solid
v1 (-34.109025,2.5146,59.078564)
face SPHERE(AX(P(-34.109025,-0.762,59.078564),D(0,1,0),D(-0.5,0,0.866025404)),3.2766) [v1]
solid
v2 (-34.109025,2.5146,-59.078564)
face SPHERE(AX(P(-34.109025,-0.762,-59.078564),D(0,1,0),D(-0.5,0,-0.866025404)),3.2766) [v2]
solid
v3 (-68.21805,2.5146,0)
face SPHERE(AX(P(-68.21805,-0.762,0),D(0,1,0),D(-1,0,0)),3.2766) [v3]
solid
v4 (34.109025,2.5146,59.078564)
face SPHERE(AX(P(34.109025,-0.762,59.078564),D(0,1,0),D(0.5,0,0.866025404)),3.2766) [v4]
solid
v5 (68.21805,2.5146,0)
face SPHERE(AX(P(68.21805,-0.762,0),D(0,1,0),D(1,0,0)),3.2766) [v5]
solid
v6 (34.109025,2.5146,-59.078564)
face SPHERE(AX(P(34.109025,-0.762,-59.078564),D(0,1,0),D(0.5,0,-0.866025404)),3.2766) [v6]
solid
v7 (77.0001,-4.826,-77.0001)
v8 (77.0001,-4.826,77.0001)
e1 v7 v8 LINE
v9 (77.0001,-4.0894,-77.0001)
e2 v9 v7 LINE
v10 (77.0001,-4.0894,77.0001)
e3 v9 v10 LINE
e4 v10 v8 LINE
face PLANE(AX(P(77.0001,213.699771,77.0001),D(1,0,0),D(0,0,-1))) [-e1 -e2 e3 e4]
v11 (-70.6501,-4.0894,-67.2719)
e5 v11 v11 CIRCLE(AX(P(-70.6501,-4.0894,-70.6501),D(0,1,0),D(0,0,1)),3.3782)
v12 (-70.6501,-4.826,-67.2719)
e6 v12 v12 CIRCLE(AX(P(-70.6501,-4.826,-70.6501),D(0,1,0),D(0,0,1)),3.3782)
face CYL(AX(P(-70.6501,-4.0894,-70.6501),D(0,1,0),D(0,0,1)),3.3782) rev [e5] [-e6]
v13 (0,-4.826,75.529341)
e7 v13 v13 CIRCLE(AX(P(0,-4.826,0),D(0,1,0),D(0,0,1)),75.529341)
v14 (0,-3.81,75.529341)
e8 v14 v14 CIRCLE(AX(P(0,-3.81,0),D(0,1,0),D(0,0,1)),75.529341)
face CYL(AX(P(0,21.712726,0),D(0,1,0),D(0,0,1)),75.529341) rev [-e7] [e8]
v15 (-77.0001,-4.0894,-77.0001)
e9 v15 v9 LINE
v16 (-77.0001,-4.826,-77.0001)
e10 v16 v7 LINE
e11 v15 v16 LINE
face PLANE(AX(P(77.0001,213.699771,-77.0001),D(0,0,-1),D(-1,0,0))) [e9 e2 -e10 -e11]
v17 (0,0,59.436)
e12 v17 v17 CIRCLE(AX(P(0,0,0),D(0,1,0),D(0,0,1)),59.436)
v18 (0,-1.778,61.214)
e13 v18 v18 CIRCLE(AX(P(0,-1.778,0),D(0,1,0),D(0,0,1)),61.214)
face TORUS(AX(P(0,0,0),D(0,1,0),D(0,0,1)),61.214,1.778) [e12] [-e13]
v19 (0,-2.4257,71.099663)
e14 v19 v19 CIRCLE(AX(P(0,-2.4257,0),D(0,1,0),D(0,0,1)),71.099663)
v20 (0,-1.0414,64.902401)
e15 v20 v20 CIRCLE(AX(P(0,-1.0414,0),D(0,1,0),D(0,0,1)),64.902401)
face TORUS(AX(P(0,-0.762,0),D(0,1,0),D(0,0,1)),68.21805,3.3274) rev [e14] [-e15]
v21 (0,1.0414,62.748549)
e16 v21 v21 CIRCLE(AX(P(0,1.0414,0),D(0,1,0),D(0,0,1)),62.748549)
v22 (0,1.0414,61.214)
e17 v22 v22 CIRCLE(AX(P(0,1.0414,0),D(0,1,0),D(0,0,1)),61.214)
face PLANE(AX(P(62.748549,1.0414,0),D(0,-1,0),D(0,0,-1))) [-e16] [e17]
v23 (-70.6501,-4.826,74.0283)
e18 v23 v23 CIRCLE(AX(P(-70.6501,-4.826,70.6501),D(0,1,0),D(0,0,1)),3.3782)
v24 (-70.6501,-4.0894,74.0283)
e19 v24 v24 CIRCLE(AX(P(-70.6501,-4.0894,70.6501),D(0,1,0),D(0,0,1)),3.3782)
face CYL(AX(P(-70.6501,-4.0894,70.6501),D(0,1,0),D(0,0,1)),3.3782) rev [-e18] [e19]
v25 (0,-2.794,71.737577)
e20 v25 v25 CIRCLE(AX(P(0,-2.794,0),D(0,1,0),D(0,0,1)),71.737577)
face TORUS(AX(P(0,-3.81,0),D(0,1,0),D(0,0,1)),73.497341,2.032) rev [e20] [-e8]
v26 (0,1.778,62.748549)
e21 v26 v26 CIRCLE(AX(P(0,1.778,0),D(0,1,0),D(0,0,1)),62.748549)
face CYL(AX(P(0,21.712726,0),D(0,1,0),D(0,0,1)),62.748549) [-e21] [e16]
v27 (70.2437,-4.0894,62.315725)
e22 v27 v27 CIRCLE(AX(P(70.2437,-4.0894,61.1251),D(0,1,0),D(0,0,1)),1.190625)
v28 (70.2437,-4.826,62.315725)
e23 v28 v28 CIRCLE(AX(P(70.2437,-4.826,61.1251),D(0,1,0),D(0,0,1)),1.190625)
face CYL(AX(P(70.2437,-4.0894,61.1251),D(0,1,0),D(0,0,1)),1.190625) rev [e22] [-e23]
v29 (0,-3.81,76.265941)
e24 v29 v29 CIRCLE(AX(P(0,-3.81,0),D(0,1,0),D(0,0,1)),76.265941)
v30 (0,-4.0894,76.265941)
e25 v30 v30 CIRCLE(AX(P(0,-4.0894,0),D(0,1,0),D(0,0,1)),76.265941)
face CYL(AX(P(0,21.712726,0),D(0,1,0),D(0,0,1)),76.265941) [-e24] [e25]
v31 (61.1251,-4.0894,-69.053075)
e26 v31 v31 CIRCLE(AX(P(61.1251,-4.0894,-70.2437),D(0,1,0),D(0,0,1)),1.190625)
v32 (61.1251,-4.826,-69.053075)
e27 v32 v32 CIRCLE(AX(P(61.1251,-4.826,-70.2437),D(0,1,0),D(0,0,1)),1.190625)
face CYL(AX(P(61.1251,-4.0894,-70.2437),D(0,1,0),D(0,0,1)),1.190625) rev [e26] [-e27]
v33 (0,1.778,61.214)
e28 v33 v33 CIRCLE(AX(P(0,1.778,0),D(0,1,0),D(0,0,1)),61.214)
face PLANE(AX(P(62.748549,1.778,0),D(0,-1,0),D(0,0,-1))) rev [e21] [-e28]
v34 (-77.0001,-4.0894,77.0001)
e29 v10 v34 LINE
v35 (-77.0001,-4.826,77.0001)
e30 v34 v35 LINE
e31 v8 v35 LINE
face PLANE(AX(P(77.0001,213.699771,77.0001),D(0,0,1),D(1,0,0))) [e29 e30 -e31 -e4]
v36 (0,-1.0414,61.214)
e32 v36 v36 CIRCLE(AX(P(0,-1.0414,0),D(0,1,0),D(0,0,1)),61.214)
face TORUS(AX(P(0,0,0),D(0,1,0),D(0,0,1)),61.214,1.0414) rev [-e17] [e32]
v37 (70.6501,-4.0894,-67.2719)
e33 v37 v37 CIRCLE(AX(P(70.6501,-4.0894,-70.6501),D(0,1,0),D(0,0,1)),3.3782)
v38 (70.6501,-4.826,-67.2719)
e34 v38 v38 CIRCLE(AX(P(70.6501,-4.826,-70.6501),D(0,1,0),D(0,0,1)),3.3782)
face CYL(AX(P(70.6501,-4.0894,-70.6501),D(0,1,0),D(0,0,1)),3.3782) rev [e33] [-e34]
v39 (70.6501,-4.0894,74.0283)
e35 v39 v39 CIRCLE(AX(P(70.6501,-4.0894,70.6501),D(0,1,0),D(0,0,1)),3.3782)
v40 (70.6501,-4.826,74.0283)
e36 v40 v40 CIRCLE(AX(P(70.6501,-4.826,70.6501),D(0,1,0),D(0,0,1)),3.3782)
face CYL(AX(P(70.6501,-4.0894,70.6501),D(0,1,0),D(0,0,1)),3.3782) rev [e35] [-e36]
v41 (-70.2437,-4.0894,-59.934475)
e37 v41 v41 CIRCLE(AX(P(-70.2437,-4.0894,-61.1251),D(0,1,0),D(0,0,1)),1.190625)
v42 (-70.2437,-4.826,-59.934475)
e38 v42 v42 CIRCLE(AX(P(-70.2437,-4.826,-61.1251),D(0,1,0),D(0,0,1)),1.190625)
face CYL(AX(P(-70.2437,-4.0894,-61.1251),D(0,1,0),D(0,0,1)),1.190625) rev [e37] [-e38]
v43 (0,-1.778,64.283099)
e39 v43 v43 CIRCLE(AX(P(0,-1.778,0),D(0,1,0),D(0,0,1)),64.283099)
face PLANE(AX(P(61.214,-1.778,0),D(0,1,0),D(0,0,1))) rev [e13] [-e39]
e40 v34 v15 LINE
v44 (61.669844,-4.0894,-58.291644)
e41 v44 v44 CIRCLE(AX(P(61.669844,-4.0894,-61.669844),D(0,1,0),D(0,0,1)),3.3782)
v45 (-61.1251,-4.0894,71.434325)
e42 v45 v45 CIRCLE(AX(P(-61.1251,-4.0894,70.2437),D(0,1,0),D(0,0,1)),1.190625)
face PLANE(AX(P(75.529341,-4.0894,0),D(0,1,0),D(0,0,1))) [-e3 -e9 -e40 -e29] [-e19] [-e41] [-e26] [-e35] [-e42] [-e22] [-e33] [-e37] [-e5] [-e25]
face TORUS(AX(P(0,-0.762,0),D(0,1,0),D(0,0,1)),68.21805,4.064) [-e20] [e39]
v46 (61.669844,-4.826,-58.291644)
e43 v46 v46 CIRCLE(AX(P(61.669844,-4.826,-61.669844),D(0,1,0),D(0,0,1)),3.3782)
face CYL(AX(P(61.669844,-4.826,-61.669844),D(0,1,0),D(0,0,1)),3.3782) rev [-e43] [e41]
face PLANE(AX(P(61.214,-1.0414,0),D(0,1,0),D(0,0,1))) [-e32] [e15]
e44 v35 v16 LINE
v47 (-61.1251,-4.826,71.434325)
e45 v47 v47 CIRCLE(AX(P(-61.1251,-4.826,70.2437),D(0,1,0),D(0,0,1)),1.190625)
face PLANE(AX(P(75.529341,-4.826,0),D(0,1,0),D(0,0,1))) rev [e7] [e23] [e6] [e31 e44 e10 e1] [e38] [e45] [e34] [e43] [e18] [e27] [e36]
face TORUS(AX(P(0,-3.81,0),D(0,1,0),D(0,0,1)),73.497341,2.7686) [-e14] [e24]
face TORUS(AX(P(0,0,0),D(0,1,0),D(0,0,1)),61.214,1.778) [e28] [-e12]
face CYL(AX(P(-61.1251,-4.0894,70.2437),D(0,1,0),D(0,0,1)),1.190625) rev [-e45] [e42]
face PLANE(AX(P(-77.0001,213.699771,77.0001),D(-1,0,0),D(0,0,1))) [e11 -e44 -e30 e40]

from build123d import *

# Parameters (mm, degrees)
SKETCH2_W                                 = 154.0002
SKETCH2_H                                 = 154.0002
SKETCH2_R                                 = 75.529340861
EXTRUDE1_DEPTH                            = 0.7366
EXTRUDE2_START                            = -0.7366
SKETCH3_R                                 = 75.529340861
EXTRUDE2_DEPTH                            = 0.7366
CIRPATTERN1_COUNT                         = 6
SKETCH5_W                                 = 3.3782
SKETCH5_H                                 = 0.7366
F_5_32_0_156250_DIAMETER_HOLE1_AT_2_COUNT = 2
F_5_32_0_156250_DIAMETER_HOLE1_AT_2_PITCH = 141.3002
F_5_32_0_156250_DIAMETER_HOLE1_AT_3_COUNT = 2
F_5_32_0_156250_DIAMETER_HOLE1_AT_3_PITCH = 141.3002
F_5_32_0_156250_DIAMETER_HOLE1_AT_4_COUNT = 2
F_5_32_0_156250_DIAMETER_HOLE1_AT_4_PITCH = 199.828659206
SKETCH7_W                                 = 2.3876
SKETCH7_H                                 = 8.128
F_5_32_0_156250_DIAMETER_HOLE2_AT_2_COUNT = 2
F_5_32_0_156250_DIAMETER_HOLE2_AT_2_PITCH = 121.0564
F_5_32_0_156250_DIAMETER_HOLE2_AT_3_COUNT = 2
F_5_32_0_156250_DIAMETER_HOLE2_AT_3_PITCH = 171.199602692
F_5_32_0_156250_DIAMETER_HOLE2_AT_4_COUNT = 2
F_5_32_0_156250_DIAMETER_HOLE2_AT_4_PITCH = 121.0564
CIRPATTERN2_COUNT                         = 4
SKETCH14_R                                = 3.3782
CUT_EXTRUDE2_DEPTH                        = 110.094654388


# Read off the part's stored shape, not the designer's step: Revolve-Thin5
with BuildPart() as part:
    # Sketch1 → Revolve-Thin4 (revolve)
    with BuildSketch(Plane.XY, mode=Mode.PRIVATE) as revolve_thin4_sk:
        with BuildLine():
            Line((62.74854946, 1.778), (61.214, 1.778))
            ThreePointArc((61.214, 1.778), (59.436, 0), (61.214, -1.778))
            Line((61.214, -1.778), (64.28309892, -1.778))
            ThreePointArc((64.28309892, -1.778), (67.669225582, -4.788771381), (71.737577241, -2.794))
            ThreePointArc((71.737577241, -2.794), (74.023261161, -1.847238721), (75.529340861, -3.81))
            Line((75.529340861, -3.81), (75.529340861, -4.826))
            Line((75.529340861, -4.826), (77.0001, -4.826))
            Line((77.0001, -4.826), (77.0001, -4.0894))
            Line((77.0001, -4.0894), (76.265940861, -4.0894))
            Line((76.265940861, -4.0894), (76.265940861, -3.81))
            ThreePointArc((76.265940861, -3.81), (74.21390727, -1.135737757), (71.099662929, -2.4257))
            ThreePointArc((71.099662929, -2.4257), (67.492675346, -4.00937161), (64.902401285, -1.0414))
            Line((64.902401285, -1.0414), (61.214, -1.0414))
            ThreePointArc((61.214, -1.0414), (60.1726, 0), (61.214, 1.0414))
            Line((61.214, 1.0414), (62.74854946, 1.0414))
            Line((62.74854946, 1.0414), (62.74854946, 1.778))
        make_face()
    revolve(revolve_thin4_sk.sketch.rotate(Axis((0, 21.71272626, 0), (0, -1, 0)), 90), axis=Axis((0, 21.71272626, 0), (0, -1, 0)))

    # Sketch2 → Extrude1 (add)
    with BuildSketch(Plane.XZ.offset(4.826)):
        Rectangle(SKETCH2_W, SKETCH2_H)
        with Locations(Location((0, 0, 0), (0, 0, 90))):
            Circle(SKETCH2_R, mode=Mode.SUBTRACT)
    extrude(amount=-EXTRUDE1_DEPTH)

    # Sketch5 → 5/32 (0.156250) Diameter Hole1 (revolve, cut)
    with BuildSketch(Plane(origin=(70.6501, -4.0894, -70.6501), x_dir=(0, 0, 1), z_dir=(1, 0, 0))):
        with Locations((1.6891, 0.3683)):
            Rectangle(SKETCH5_W, SKETCH5_H)
    f_5_32_0_156250_diameter_hole1 = revolve(axis=Axis((70.6501, 2.2606, -70.6501), (0, -1, 0)), mode=Mode.SUBTRACT)

    # 5/32 (0.156250) Diameter Hole1 at 2: 5/32 (0.156250) Diameter Hole1 ×2
    with Locations(*[(0, 0, i * F_5_32_0_156250_DIAMETER_HOLE1_AT_2_PITCH) for i in range(1, F_5_32_0_156250_DIAMETER_HOLE1_AT_2_COUNT)]):
        add(f_5_32_0_156250_diameter_hole1, mode=Mode.SUBTRACT)

    # 5/32 (0.156250) Diameter Hole1 at 3: 5/32 (0.156250) Diameter Hole1 ×2
    with Locations(*[(-i * F_5_32_0_156250_DIAMETER_HOLE1_AT_3_PITCH, 0, 0) for i in range(1, F_5_32_0_156250_DIAMETER_HOLE1_AT_3_COUNT)]):
        add(f_5_32_0_156250_diameter_hole1, mode=Mode.SUBTRACT)

    # 5/32 (0.156250) Diameter Hole1 at 4: 5/32 (0.156250) Diameter Hole1 ×2
    with Locations(*[Vector(-0.7071067811865476, 0, 0.7071067811865476) * (i * F_5_32_0_156250_DIAMETER_HOLE1_AT_4_PITCH) for i in range(1, F_5_32_0_156250_DIAMETER_HOLE1_AT_4_COUNT)]):
        add(f_5_32_0_156250_diameter_hole1, mode=Mode.SUBTRACT)

    # Sketch11 → 3/32 (0.093750) Diameter Hole2 (revolve, cut)
    with BuildSketch(Plane(origin=(-70.2437, -4.0894, -61.1251), x_dir=(0, 0, 1), z_dir=(1, 0, 0))):
        Polygon((0, 0), (0, 26.115399675), (1.190625, 25.4), (1.190625, 0), align=None)
    f_3_32_0_093750_diameter_hole2 = revolve(axis=Axis((-70.2437, 2.2606, -61.1251), (0, -1, 0)), mode=Mode.SUBTRACT)

    # CirPattern2: 3/32 (0.093750) Diameter Hole2 ×4 about axis
    cirpattern2_axis = Axis((0, 0, 0), (0, 1, 0))
    for i in range(1, CIRPATTERN2_COUNT):
        add(f_3_32_0_093750_diameter_hole2.rotate(cirpattern2_axis, i * 360 / CIRPATTERN2_COUNT), mode=Mode.SUBTRACT)

    # Sketch14 → Cut-Extrude2 (cut, through all)
    with BuildSketch(Plane(origin=(0, -4.0894, 0), x_dir=(1, 0, 0), z_dir=(0, 1, 0))):
        with Locations(Location((61.669843879, 61.669843879, 0), (0, 0, 270))):
            Circle(SKETCH14_R)
    extrude(amount=-CUT_EXTRUDE2_DEPTH, mode=Mode.SUBTRACT)


with BuildPart() as body_2:
    # Revolve-Thin5 outline → Revolve-Thin5 (revolve)
    with BuildSketch(Plane.XY):
        with BuildLine():
            Line((76.265940861, 2.5654), (77.0001, 2.5654))
            Line((77.0001, 2.5654), (77.0001, 3.302))
            Line((77.0001, 3.302), (75.529340861, 3.302))
            Line((75.529340861, 3.302), (75.529340861, 2.286))
            ThreePointArc((75.529340861, 2.286), (74.023261161, 0.323238721), (71.737577241, 1.27))
            ThreePointArc((71.737577241, 1.27), (68.088390068, 3.299931105), (64.576093872, 1.0414))
            Line((64.576093872, 1.0414), (61.214, 1.0414))
            Line((61.214, 1.0414), (61.214, 0.3048))
            Line((61.214, 0.3048), (65.066299927, 0.3048))
            ThreePointArc((65.066299927, 0.3048), (67.890458911, 2.54923464), (71.099662929, 0.9017))
            ThreePointArc((71.099662929, 0.9017), (74.21390727, -0.388262243), (76.265940861, 2.286))
            Line((76.265940861, 2.286), (76.265940861, 2.5654))
        make_face()
    revolve(axis=Axis((0, 0, 0), (0, 1, 0)))

    # Sketch3 → Extrude2 (add)
    with BuildSketch(Plane(origin=(0, 3.302, 0), x_dir=(-1, 0, 0), z_dir=(0, 1, 0)).offset(EXTRUDE2_START)):
        Polygon((0, -108.894585724), (108.894585724, 0), (0, 108.894585724), (-108.894585724, 0), align=None)
        with Locations(Location((0, 0, 0), (0, 0, 90))):
            Circle(SKETCH3_R, mode=Mode.SUBTRACT)
    extrude(amount=EXTRUDE2_DEPTH)

    # Sketch7 → 5/32 (0.156250) Diameter Hole2 (revolve, cut)
    with BuildSketch(Plane(origin=(85.599801346, 3.302, 0), x_dir=(0, 0, 1), z_dir=(1, 0, 0))):
        with Locations((1.1938, 4.064)):
            Rectangle(SKETCH7_W, SKETCH7_H)
    f_5_32_0_156250_diameter_hole2 = revolve(axis=Axis((85.599801346, 9.652, 0), (0, -1, 0)), mode=Mode.SUBTRACT)

    # 5/32 (0.156250) Diameter Hole2 at 2: 5/32 (0.156250) Diameter Hole2 ×2
    with Locations(*[Vector(-0.7071067811865476, 0, -0.7071067811865476) * (i * F_5_32_0_156250_DIAMETER_HOLE2_AT_2_PITCH) for i in range(1, F_5_32_0_156250_DIAMETER_HOLE2_AT_2_COUNT)]):
        add(f_5_32_0_156250_diameter_hole2, mode=Mode.SUBTRACT)

    # 5/32 (0.156250) Diameter Hole2 at 3: 5/32 (0.156250) Diameter Hole2 ×2
    with Locations(*[(-i * F_5_32_0_156250_DIAMETER_HOLE2_AT_3_PITCH, 0, 0) for i in range(1, F_5_32_0_156250_DIAMETER_HOLE2_AT_3_COUNT)]):
        add(f_5_32_0_156250_diameter_hole2, mode=Mode.SUBTRACT)

    # 5/32 (0.156250) Diameter Hole2 at 4: 5/32 (0.156250) Diameter Hole2 ×2
    with Locations(*[Vector(-0.7071067811865476, 0, 0.7071067811865476) * (i * F_5_32_0_156250_DIAMETER_HOLE2_AT_4_PITCH) for i in range(1, F_5_32_0_156250_DIAMETER_HOLE2_AT_4_COUNT)]):
        add(f_5_32_0_156250_diameter_hole2, mode=Mode.SUBTRACT)


with BuildPart() as body_3:
    # Sketch4 → Revolve1 (revolve)
    with BuildSketch(Plane.XY):
        with BuildLine():
            Line((68.21805, 2.5146), (68.21805, -4.0386))
            ThreePointArc((68.21805, -4.0386), (71.49465, -0.762), (68.21805, 2.5146))
        make_face()
    revolve(axis=Axis((68.21805, 2.837450101, 0), (0, -1, 0)))


with BuildPart() as cirpattern1_1:
    # CirPattern1: pattern copy
    add(body_3.part.rotate(Axis((0, 0, 0), (0, 1, 0)), 1 * 360 / CIRPATTERN1_COUNT))


with BuildPart() as cirpattern1_2:
    # CirPattern1: pattern copy
    add(body_3.part.rotate(Axis((0, 0, 0), (0, 1, 0)), 2 * 360 / CIRPATTERN1_COUNT))


with BuildPart() as cirpattern1_3:
    # CirPattern1: pattern copy
    add(body_3.part.rotate(Axis((0, 0, 0), (0, 1, 0)), 3 * 360 / CIRPATTERN1_COUNT))


with BuildPart() as cirpattern1_4:
    # CirPattern1: pattern copy
    add(body_3.part.rotate(Axis((0, 0, 0), (0, 1, 0)), 4 * 360 / CIRPATTERN1_COUNT))


with BuildPart() as cirpattern1_5:
    # CirPattern1: pattern copy
    add(body_3.part.rotate(Axis((0, 0, 0), (0, 1, 0)), 5 * 360 / CIRPATTERN1_COUNT))


solid = Compound([part.part, body_3.part, cirpattern1_1.part, cirpattern1_2.part, cirpattern1_3.part, cirpattern1_4.part, cirpattern1_5.part])
